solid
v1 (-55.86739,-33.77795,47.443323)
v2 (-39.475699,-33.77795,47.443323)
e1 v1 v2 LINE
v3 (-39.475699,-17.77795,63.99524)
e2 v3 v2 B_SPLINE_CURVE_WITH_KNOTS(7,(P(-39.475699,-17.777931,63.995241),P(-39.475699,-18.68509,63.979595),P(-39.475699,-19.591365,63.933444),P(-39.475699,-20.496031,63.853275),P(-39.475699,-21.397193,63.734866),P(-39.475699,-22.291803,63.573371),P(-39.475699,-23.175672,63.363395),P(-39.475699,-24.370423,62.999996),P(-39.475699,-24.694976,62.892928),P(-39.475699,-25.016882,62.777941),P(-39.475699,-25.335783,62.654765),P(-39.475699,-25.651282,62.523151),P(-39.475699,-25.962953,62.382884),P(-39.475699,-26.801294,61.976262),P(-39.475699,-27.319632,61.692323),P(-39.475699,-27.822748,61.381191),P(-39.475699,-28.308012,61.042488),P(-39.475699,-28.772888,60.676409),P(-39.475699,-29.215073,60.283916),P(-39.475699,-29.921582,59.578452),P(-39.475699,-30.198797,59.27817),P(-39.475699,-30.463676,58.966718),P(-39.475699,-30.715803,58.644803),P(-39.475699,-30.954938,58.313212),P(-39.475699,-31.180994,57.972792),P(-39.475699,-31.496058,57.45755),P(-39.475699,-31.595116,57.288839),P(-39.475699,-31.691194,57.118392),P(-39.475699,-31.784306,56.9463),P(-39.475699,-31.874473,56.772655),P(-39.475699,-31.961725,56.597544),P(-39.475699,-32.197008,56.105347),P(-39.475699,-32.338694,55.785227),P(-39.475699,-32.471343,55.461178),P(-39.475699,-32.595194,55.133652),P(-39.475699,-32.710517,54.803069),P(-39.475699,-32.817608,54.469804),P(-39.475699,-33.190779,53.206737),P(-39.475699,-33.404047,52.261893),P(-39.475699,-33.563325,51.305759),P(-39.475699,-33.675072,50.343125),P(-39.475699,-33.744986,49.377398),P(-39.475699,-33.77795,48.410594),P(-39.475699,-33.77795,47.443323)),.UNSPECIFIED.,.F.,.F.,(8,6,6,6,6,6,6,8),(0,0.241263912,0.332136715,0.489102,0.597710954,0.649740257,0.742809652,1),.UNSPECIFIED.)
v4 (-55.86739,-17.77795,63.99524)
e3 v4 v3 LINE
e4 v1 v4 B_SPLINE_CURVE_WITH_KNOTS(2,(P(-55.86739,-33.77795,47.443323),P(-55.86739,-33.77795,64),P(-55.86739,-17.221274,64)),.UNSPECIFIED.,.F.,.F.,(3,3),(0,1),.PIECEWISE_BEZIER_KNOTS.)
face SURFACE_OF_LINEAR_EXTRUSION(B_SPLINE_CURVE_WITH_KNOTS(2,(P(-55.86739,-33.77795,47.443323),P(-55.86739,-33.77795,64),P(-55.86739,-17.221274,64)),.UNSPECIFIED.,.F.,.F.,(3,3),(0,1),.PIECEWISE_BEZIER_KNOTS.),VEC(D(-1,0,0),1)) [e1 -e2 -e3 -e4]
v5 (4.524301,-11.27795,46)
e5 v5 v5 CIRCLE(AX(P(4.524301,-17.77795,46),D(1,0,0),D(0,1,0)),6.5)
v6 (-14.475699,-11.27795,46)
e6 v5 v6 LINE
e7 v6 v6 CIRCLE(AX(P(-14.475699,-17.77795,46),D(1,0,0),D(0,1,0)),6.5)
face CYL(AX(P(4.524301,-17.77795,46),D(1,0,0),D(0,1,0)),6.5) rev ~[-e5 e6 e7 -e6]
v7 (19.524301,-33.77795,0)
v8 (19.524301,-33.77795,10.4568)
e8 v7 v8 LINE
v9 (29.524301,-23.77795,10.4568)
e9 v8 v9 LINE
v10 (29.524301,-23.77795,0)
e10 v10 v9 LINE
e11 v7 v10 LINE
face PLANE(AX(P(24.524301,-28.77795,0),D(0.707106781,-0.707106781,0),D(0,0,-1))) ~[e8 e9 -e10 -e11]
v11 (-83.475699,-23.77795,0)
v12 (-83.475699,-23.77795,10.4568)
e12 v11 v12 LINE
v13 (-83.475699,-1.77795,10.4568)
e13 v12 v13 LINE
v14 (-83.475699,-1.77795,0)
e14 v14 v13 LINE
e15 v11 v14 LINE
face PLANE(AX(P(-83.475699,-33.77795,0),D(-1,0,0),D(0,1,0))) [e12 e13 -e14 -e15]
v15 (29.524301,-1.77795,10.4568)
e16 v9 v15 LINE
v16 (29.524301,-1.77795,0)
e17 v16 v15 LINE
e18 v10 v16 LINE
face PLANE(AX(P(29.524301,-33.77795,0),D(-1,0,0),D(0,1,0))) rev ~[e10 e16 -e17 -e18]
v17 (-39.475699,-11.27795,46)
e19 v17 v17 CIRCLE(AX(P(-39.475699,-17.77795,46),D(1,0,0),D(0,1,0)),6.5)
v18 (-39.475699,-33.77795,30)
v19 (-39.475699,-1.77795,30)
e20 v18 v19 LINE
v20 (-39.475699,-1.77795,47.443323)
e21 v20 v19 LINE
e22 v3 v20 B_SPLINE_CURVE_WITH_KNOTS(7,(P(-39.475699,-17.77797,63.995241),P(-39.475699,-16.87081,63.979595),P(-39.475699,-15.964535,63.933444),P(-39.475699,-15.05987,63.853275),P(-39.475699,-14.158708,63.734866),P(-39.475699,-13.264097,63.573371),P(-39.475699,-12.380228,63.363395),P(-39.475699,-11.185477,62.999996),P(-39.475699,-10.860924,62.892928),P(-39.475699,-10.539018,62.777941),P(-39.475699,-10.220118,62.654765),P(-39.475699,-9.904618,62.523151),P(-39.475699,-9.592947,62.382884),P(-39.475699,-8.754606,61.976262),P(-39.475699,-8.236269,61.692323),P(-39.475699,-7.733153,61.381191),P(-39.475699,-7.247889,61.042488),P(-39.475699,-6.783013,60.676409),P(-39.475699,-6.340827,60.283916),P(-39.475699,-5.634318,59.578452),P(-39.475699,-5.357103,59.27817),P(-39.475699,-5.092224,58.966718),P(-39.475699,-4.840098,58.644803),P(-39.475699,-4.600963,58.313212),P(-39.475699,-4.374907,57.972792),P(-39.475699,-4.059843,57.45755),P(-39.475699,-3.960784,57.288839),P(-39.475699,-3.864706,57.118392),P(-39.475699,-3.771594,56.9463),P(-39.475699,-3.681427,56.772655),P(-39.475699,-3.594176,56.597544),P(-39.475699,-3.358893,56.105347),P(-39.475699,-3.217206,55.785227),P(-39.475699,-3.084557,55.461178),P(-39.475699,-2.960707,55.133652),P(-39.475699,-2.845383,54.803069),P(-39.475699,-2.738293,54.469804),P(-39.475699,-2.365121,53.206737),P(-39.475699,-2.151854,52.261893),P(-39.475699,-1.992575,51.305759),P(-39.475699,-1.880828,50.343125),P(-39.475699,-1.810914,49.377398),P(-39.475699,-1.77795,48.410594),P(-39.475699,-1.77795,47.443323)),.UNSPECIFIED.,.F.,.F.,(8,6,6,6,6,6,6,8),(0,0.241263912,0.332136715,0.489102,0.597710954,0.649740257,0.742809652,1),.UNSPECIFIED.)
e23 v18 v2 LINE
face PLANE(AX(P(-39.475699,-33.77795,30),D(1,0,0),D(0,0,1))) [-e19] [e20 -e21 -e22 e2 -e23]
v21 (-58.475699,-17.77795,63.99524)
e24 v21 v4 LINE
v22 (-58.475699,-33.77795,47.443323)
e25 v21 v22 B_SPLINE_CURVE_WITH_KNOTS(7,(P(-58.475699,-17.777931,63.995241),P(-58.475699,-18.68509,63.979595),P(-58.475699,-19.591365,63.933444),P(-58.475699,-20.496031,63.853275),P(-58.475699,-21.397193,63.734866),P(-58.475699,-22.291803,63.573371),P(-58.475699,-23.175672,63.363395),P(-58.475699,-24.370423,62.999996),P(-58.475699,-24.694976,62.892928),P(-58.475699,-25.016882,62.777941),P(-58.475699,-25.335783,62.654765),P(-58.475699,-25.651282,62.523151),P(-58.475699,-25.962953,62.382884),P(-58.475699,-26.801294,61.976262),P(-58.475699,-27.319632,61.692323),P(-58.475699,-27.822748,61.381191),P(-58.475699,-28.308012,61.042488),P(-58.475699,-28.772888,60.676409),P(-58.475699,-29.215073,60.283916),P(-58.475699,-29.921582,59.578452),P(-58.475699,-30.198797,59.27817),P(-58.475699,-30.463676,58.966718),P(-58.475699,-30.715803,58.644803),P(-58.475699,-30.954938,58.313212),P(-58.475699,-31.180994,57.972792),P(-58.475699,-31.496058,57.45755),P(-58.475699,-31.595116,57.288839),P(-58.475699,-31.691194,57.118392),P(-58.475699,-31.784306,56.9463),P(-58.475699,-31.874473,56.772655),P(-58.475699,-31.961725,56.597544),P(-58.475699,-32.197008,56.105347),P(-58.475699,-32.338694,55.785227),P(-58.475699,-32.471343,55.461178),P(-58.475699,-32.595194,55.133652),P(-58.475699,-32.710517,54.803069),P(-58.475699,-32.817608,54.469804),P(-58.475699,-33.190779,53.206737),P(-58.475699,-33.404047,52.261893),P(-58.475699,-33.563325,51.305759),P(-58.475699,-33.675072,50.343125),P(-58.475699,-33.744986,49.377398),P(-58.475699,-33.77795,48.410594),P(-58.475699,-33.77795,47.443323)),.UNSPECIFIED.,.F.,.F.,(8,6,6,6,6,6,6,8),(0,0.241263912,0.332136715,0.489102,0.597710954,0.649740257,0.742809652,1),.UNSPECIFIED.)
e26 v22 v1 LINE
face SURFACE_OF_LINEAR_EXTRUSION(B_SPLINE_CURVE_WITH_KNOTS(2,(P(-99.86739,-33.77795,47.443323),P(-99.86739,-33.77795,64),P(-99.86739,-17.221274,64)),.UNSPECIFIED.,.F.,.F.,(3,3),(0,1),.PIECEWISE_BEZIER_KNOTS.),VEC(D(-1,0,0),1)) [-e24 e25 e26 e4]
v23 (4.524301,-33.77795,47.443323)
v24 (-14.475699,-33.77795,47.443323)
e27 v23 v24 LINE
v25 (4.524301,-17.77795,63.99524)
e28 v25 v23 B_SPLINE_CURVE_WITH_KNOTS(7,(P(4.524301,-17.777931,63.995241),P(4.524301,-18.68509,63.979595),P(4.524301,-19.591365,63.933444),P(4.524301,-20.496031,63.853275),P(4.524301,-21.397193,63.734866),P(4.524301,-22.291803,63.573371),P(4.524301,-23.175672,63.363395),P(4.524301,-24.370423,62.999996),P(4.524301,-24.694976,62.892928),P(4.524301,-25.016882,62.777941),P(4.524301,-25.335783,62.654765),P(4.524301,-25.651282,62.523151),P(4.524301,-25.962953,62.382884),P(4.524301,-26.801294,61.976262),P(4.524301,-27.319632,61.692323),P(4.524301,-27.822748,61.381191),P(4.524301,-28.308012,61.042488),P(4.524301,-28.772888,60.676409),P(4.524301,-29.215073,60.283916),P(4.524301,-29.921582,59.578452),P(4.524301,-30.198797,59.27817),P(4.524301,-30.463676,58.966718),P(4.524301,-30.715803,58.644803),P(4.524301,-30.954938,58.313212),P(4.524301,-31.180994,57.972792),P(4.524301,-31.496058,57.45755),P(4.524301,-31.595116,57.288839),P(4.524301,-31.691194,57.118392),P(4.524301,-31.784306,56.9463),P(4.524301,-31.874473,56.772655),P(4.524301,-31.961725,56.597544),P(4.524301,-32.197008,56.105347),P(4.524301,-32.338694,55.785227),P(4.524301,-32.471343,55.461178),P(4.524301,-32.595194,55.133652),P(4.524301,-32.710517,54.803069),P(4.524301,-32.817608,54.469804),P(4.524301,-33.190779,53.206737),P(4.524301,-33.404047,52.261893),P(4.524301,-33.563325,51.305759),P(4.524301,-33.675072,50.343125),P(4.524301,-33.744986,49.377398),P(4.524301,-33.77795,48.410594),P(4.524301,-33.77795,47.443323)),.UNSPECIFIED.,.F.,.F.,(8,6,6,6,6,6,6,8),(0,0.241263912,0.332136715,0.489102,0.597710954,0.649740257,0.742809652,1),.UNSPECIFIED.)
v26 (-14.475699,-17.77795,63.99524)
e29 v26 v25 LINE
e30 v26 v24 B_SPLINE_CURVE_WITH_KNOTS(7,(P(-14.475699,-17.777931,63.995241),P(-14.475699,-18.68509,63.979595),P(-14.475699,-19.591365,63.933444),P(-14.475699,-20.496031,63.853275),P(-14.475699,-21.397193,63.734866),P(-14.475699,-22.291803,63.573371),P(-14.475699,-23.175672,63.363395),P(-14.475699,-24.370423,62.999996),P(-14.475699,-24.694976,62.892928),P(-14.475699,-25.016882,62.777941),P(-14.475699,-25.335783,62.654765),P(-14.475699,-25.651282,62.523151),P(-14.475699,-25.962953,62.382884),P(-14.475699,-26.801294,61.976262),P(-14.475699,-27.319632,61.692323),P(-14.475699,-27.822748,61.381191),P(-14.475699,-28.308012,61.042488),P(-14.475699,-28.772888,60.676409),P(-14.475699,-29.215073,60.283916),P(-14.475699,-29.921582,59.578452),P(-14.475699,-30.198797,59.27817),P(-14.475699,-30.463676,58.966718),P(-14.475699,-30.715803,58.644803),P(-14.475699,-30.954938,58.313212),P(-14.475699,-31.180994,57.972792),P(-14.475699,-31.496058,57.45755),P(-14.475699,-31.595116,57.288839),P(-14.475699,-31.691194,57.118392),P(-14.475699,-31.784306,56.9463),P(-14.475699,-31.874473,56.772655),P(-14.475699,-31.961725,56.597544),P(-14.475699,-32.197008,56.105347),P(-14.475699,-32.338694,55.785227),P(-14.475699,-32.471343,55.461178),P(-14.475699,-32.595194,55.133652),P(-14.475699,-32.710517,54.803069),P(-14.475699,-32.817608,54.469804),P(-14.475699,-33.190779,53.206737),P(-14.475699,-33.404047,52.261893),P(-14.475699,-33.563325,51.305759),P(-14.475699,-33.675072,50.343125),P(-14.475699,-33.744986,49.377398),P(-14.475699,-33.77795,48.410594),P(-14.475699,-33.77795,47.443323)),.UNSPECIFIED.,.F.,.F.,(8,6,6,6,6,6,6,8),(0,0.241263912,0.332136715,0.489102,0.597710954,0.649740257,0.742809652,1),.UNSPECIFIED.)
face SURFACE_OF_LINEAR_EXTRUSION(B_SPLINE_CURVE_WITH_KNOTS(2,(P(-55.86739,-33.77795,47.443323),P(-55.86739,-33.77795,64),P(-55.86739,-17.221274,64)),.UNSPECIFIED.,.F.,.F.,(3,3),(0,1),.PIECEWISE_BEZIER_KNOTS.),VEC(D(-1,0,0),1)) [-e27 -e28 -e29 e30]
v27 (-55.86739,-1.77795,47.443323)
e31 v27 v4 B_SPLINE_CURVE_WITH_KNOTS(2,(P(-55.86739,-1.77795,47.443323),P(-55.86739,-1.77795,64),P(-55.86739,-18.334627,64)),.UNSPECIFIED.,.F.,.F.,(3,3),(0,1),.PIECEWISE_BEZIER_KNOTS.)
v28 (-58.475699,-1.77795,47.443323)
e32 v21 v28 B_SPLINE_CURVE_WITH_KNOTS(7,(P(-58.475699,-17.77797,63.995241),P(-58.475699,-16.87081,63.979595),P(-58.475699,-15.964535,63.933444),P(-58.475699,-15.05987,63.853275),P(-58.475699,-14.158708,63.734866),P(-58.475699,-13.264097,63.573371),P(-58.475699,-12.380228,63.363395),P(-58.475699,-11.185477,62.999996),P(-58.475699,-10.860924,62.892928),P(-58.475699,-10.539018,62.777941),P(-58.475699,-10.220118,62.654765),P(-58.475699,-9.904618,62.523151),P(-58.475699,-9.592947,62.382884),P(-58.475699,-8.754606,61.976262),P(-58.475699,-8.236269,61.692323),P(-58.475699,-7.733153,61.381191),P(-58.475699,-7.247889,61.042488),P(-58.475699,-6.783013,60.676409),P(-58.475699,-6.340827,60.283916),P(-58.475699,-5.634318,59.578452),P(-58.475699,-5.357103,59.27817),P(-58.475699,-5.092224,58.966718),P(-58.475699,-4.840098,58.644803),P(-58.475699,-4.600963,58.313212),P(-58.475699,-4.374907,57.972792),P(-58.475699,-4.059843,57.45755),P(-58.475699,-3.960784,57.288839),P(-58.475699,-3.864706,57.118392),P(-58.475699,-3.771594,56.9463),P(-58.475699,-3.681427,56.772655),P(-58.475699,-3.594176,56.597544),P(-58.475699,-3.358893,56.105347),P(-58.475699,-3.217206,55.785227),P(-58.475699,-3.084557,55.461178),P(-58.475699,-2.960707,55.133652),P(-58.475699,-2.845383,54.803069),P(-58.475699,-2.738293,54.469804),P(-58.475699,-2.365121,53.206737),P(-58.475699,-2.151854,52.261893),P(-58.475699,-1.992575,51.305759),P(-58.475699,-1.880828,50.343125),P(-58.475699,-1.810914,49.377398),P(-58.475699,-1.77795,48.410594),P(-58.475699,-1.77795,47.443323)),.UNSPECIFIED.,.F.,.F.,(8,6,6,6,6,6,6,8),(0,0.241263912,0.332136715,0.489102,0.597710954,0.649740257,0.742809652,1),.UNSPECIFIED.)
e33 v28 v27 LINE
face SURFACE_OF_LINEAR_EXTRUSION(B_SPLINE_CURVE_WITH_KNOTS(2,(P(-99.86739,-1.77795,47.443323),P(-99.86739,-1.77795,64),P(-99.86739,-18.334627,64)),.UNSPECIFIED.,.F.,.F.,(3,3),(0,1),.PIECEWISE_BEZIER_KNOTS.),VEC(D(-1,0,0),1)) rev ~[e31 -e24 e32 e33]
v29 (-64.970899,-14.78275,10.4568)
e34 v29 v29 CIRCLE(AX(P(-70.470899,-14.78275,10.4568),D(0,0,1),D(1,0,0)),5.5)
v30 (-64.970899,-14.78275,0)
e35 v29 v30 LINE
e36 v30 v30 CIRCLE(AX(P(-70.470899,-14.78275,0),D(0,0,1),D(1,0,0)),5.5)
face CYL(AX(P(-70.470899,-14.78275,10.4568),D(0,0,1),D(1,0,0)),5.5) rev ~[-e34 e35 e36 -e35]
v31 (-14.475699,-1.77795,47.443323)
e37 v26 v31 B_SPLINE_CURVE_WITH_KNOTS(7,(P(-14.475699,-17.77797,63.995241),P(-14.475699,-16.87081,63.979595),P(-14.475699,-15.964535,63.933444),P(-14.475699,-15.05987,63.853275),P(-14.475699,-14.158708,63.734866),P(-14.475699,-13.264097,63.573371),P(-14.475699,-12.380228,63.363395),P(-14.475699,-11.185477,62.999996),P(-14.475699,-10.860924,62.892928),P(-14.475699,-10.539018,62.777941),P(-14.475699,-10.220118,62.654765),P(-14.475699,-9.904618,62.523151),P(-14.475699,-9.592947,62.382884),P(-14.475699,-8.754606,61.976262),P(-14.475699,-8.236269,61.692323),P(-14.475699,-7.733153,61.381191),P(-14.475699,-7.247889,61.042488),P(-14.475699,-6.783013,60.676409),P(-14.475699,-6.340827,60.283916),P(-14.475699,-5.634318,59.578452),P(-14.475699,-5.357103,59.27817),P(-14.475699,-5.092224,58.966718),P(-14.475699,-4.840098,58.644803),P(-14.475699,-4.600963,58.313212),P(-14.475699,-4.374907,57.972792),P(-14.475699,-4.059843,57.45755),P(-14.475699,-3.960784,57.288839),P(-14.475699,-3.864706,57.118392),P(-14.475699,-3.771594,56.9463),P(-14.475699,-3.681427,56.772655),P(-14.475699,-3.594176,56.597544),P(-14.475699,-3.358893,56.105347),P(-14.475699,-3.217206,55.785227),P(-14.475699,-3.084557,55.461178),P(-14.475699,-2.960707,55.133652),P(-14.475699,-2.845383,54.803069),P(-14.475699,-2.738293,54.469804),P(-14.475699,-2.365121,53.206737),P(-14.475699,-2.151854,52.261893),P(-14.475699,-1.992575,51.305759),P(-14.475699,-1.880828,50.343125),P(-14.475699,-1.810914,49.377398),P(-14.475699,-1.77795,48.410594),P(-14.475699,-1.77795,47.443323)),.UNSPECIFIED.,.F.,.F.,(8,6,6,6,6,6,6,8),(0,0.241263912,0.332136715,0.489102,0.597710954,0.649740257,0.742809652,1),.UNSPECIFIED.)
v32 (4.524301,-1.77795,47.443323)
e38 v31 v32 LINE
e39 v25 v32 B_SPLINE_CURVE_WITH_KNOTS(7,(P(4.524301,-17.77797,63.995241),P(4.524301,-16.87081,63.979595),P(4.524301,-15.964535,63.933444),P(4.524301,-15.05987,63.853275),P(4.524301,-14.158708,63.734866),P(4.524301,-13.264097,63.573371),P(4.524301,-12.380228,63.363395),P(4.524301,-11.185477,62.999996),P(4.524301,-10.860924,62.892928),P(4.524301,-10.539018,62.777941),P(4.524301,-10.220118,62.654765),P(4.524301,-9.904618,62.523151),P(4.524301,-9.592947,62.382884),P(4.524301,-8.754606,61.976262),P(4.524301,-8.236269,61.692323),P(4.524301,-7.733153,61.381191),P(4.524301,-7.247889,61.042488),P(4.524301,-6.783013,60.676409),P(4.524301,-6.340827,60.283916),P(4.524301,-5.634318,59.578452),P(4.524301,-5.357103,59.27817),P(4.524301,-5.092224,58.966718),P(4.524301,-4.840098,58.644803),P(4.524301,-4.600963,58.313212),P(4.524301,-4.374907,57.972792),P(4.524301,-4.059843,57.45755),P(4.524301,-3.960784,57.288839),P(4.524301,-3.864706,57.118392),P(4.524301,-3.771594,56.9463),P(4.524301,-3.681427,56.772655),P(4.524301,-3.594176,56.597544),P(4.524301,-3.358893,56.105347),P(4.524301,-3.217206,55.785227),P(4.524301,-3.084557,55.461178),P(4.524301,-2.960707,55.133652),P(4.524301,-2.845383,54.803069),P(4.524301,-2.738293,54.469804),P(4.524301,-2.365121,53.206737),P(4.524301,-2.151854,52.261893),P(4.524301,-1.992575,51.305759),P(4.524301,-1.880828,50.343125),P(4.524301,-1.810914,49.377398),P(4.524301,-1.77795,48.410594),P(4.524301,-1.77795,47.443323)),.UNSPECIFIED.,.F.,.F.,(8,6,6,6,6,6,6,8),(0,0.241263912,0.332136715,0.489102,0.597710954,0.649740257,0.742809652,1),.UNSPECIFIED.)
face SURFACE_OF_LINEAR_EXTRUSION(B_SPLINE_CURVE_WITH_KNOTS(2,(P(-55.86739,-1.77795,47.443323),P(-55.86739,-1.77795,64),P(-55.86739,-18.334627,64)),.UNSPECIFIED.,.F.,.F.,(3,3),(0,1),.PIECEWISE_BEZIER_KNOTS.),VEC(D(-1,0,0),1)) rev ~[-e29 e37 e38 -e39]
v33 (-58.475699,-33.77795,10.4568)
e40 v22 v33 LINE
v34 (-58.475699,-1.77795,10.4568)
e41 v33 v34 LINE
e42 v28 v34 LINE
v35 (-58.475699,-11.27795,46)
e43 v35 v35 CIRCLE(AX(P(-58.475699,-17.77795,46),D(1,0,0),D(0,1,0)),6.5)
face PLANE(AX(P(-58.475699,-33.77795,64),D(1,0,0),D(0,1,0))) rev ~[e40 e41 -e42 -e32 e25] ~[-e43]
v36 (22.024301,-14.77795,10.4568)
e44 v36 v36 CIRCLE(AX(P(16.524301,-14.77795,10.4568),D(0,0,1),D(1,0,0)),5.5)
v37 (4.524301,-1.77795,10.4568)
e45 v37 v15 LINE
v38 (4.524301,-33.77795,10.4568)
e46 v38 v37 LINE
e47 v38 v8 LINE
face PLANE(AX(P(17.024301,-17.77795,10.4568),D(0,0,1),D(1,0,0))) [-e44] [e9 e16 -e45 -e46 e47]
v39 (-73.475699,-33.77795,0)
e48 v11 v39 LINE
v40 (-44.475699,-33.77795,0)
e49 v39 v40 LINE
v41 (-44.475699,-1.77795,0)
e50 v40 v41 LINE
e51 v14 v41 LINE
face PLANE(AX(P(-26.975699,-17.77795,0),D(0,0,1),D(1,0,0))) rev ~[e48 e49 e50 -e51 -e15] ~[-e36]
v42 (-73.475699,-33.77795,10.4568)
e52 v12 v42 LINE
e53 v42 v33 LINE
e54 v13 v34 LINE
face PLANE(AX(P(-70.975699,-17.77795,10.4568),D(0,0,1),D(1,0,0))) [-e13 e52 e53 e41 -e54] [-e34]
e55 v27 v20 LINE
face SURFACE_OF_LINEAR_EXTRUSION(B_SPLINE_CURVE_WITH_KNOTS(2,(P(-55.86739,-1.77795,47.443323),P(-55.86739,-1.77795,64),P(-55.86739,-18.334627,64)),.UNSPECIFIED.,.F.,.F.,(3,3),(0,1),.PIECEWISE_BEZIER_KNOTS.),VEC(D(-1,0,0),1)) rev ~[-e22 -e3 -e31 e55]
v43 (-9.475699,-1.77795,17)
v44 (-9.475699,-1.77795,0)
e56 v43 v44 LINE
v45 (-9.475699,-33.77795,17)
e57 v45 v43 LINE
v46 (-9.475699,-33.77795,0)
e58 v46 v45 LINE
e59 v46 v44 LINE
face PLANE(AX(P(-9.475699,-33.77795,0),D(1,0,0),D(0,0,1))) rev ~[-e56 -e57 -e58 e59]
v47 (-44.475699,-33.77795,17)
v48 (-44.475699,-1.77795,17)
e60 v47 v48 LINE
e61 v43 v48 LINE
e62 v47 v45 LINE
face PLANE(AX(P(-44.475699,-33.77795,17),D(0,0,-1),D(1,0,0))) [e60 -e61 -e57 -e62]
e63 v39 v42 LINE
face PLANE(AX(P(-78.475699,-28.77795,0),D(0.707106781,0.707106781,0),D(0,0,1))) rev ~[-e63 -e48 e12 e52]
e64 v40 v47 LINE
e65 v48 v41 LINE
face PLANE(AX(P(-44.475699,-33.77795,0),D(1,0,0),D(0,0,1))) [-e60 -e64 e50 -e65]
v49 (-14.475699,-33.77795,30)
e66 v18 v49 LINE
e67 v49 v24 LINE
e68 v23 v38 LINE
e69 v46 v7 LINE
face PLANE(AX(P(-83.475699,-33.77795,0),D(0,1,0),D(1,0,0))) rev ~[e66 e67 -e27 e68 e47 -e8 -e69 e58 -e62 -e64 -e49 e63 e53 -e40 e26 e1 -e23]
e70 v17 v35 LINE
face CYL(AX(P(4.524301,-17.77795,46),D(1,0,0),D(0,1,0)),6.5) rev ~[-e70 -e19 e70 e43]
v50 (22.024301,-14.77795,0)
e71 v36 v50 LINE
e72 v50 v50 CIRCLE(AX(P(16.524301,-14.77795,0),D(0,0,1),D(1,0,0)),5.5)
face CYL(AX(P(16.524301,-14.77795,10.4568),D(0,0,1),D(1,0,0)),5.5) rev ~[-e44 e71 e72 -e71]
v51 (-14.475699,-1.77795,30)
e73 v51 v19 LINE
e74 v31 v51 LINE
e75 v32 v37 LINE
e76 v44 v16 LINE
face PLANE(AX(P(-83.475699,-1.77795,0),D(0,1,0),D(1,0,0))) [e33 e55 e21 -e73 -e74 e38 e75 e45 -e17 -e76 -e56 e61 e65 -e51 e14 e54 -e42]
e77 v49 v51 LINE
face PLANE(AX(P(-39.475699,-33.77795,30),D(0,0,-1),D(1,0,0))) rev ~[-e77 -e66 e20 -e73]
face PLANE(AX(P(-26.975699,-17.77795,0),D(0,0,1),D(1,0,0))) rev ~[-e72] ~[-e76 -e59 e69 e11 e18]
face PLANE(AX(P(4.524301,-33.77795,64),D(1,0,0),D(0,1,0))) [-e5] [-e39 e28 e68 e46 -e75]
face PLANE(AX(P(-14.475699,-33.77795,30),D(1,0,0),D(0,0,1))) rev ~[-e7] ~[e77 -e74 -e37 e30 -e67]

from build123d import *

# Parameters (mm, degrees)
F0_W         = 113
F0_H         = 32
F1_DEPTH     = 64
F2_W         = 25
F2_H         = 32
F3_DEPTH     = 53.5432
F4_W         = 35
F4_H         = 17
F5_DEPTH     = 34.544
F6_SIZE      = 10
F7_W         = 25
F7_H         = 34
F8_DEPTH     = 33.274
F9_R         = 5.5
F10_DEPTH    = 25.4
F11_R        = 6.5
F12_DEPTH    = 82.296
F13_T1_DEPTH = 101.7833830538
F13_T3_DEPTH = 101.7833830538


# Not quite as in the source:
# - a fillet or chamfer that OpenCascade refuses, or shapes differently, is made with other operations: its cross-section is extruded or revolved along the edge and cut away or added


with BuildPart() as f1:
    # F0 (on Top) → F1 (new body)
    with BuildSketch(Plane.XY):
        with Locations((-26.9756987691, -17.7779501617)):
            Rectangle(F0_W, F0_H)
    extrude(amount=F1_DEPTH)

    # F2 (on face) → F3 (cut)
    with BuildSketch(Plane.XY.offset(64)):
        with Locations((-70.9756987691, -17.7779501617)):
            Rectangle(F2_W, F2_H)
        with Locations((17.0243012309, -17.7779501617)):
            Rectangle(F2_W, F2_H)
    extrude(amount=-F3_DEPTH, mode=Mode.SUBTRACT)

    # F4 (on face) → F5 (cut)
    with BuildSketch(Plane.XZ.offset(33.7779501617)):
        with Locations((-26.9756987691, 8.5)):
            Rectangle(F4_W, F4_H)
    extrude(amount=-F5_DEPTH, mode=Mode.SUBTRACT)

    # F6
    f6_edges = [f1.edges().sort_by_distance(p)[0] for p in [
        (29.524301, -33.77795, 5.2284),
        (-83.475699, -33.77795, 5.2284),
    ]]
    chamfer(f6_edges, length=F6_SIZE)

    # F7 (on face) → F8 (cut)
    with BuildSketch(Plane.XZ.offset(33.7779501617)):
        with Locations((-26.9756987691, 47)):
            Rectangle(F7_W, F7_H)
    extrude(amount=-F8_DEPTH, mode=Mode.SUBTRACT)

    # F9 (on face) → F10 (cut)
    with BuildSketch(Plane.XY.offset(10.4568)):
        with Locations((-70.4708987691, -14.7827501617)):
            Circle(F9_R)
        with Locations((16.5243012309, -14.7779501617)):
            Circle(F9_R)
    extrude(amount=-F10_DEPTH, mode=Mode.SUBTRACT)

    # F11 (on face) → F12 (cut)
    with BuildSketch(Plane.YZ.offset(4.5243012309)):
        with Locations((-17.7779501617, 46)):
            Circle(F11_R)
    extrude(amount=-F12_DEPTH, mode=Mode.SUBTRACT)

    # F13: fillet of radius 16.5566766108 on 4 edges, made by hand

    # F13_s2 → F13_t1 (cut)
    with BuildSketch(Plane.YZ.offset(-55.867390296)):
        with BuildLine():
            add(Edge.make_bspline(
                [(-33.7779501617, 47.4433233892), (-33.7779501617, 64), (-17.2212735509, 64)],
                knots=[0, 0, 0, 1, 1, 1], degree=2, weights=[1, 1, 1]))
            Line((-17.2212735509, 64), (-33.7779501617, 64))
            Line((-33.7779501617, 64), (-33.7779501617, 47.4433233892))
        make_face()
        with BuildLine():
            add(Edge.make_bspline(
                [(-1.7779501617, 47.4433233892), (-1.7779501617, 64), (-18.3346267724, 64)],
                knots=[0, 0, 0, 1, 1, 1], degree=2, weights=[1, 1, 1]))
            Line((-18.3346267724, 64), (-1.7779501617, 64))
            Line((-1.7779501617, 64), (-1.7779501617, 47.4433233892))
        make_face()
    extrude(amount=F13_T1_DEPTH, mode=Mode.SUBTRACT)

    # F13_s4 → F13_t3 (cut)
    with BuildSketch(Plane.YZ.offset(-99.867390296)):
        with BuildLine():
            add(Edge.make_bspline(
                [(-33.7779501617, 47.4433233892), (-33.7779501617, 64), (-17.2212735509, 64)],
                knots=[0, 0, 0, 1, 1, 1], degree=2, weights=[1, 1, 1]))
            Line((-17.2212735509, 64), (-33.7779501617, 64))
            Line((-33.7779501617, 64), (-33.7779501617, 47.4433233892))
        make_face()
        with BuildLine():
            add(Edge.make_bspline(
                [(-1.7779501617, 47.4433233892), (-1.7779501617, 64), (-18.3346267724, 64)],
                knots=[0, 0, 0, 1, 1, 1], degree=2, weights=[1, 1, 1]))
            Line((-18.3346267724, 64), (-1.7779501617, 64))
            Line((-1.7779501617, 64), (-1.7779501617, 47.4433233892))
        make_face()
    extrude(amount=F13_T3_DEPTH, mode=Mode.SUBTRACT)


solid = f1.part
